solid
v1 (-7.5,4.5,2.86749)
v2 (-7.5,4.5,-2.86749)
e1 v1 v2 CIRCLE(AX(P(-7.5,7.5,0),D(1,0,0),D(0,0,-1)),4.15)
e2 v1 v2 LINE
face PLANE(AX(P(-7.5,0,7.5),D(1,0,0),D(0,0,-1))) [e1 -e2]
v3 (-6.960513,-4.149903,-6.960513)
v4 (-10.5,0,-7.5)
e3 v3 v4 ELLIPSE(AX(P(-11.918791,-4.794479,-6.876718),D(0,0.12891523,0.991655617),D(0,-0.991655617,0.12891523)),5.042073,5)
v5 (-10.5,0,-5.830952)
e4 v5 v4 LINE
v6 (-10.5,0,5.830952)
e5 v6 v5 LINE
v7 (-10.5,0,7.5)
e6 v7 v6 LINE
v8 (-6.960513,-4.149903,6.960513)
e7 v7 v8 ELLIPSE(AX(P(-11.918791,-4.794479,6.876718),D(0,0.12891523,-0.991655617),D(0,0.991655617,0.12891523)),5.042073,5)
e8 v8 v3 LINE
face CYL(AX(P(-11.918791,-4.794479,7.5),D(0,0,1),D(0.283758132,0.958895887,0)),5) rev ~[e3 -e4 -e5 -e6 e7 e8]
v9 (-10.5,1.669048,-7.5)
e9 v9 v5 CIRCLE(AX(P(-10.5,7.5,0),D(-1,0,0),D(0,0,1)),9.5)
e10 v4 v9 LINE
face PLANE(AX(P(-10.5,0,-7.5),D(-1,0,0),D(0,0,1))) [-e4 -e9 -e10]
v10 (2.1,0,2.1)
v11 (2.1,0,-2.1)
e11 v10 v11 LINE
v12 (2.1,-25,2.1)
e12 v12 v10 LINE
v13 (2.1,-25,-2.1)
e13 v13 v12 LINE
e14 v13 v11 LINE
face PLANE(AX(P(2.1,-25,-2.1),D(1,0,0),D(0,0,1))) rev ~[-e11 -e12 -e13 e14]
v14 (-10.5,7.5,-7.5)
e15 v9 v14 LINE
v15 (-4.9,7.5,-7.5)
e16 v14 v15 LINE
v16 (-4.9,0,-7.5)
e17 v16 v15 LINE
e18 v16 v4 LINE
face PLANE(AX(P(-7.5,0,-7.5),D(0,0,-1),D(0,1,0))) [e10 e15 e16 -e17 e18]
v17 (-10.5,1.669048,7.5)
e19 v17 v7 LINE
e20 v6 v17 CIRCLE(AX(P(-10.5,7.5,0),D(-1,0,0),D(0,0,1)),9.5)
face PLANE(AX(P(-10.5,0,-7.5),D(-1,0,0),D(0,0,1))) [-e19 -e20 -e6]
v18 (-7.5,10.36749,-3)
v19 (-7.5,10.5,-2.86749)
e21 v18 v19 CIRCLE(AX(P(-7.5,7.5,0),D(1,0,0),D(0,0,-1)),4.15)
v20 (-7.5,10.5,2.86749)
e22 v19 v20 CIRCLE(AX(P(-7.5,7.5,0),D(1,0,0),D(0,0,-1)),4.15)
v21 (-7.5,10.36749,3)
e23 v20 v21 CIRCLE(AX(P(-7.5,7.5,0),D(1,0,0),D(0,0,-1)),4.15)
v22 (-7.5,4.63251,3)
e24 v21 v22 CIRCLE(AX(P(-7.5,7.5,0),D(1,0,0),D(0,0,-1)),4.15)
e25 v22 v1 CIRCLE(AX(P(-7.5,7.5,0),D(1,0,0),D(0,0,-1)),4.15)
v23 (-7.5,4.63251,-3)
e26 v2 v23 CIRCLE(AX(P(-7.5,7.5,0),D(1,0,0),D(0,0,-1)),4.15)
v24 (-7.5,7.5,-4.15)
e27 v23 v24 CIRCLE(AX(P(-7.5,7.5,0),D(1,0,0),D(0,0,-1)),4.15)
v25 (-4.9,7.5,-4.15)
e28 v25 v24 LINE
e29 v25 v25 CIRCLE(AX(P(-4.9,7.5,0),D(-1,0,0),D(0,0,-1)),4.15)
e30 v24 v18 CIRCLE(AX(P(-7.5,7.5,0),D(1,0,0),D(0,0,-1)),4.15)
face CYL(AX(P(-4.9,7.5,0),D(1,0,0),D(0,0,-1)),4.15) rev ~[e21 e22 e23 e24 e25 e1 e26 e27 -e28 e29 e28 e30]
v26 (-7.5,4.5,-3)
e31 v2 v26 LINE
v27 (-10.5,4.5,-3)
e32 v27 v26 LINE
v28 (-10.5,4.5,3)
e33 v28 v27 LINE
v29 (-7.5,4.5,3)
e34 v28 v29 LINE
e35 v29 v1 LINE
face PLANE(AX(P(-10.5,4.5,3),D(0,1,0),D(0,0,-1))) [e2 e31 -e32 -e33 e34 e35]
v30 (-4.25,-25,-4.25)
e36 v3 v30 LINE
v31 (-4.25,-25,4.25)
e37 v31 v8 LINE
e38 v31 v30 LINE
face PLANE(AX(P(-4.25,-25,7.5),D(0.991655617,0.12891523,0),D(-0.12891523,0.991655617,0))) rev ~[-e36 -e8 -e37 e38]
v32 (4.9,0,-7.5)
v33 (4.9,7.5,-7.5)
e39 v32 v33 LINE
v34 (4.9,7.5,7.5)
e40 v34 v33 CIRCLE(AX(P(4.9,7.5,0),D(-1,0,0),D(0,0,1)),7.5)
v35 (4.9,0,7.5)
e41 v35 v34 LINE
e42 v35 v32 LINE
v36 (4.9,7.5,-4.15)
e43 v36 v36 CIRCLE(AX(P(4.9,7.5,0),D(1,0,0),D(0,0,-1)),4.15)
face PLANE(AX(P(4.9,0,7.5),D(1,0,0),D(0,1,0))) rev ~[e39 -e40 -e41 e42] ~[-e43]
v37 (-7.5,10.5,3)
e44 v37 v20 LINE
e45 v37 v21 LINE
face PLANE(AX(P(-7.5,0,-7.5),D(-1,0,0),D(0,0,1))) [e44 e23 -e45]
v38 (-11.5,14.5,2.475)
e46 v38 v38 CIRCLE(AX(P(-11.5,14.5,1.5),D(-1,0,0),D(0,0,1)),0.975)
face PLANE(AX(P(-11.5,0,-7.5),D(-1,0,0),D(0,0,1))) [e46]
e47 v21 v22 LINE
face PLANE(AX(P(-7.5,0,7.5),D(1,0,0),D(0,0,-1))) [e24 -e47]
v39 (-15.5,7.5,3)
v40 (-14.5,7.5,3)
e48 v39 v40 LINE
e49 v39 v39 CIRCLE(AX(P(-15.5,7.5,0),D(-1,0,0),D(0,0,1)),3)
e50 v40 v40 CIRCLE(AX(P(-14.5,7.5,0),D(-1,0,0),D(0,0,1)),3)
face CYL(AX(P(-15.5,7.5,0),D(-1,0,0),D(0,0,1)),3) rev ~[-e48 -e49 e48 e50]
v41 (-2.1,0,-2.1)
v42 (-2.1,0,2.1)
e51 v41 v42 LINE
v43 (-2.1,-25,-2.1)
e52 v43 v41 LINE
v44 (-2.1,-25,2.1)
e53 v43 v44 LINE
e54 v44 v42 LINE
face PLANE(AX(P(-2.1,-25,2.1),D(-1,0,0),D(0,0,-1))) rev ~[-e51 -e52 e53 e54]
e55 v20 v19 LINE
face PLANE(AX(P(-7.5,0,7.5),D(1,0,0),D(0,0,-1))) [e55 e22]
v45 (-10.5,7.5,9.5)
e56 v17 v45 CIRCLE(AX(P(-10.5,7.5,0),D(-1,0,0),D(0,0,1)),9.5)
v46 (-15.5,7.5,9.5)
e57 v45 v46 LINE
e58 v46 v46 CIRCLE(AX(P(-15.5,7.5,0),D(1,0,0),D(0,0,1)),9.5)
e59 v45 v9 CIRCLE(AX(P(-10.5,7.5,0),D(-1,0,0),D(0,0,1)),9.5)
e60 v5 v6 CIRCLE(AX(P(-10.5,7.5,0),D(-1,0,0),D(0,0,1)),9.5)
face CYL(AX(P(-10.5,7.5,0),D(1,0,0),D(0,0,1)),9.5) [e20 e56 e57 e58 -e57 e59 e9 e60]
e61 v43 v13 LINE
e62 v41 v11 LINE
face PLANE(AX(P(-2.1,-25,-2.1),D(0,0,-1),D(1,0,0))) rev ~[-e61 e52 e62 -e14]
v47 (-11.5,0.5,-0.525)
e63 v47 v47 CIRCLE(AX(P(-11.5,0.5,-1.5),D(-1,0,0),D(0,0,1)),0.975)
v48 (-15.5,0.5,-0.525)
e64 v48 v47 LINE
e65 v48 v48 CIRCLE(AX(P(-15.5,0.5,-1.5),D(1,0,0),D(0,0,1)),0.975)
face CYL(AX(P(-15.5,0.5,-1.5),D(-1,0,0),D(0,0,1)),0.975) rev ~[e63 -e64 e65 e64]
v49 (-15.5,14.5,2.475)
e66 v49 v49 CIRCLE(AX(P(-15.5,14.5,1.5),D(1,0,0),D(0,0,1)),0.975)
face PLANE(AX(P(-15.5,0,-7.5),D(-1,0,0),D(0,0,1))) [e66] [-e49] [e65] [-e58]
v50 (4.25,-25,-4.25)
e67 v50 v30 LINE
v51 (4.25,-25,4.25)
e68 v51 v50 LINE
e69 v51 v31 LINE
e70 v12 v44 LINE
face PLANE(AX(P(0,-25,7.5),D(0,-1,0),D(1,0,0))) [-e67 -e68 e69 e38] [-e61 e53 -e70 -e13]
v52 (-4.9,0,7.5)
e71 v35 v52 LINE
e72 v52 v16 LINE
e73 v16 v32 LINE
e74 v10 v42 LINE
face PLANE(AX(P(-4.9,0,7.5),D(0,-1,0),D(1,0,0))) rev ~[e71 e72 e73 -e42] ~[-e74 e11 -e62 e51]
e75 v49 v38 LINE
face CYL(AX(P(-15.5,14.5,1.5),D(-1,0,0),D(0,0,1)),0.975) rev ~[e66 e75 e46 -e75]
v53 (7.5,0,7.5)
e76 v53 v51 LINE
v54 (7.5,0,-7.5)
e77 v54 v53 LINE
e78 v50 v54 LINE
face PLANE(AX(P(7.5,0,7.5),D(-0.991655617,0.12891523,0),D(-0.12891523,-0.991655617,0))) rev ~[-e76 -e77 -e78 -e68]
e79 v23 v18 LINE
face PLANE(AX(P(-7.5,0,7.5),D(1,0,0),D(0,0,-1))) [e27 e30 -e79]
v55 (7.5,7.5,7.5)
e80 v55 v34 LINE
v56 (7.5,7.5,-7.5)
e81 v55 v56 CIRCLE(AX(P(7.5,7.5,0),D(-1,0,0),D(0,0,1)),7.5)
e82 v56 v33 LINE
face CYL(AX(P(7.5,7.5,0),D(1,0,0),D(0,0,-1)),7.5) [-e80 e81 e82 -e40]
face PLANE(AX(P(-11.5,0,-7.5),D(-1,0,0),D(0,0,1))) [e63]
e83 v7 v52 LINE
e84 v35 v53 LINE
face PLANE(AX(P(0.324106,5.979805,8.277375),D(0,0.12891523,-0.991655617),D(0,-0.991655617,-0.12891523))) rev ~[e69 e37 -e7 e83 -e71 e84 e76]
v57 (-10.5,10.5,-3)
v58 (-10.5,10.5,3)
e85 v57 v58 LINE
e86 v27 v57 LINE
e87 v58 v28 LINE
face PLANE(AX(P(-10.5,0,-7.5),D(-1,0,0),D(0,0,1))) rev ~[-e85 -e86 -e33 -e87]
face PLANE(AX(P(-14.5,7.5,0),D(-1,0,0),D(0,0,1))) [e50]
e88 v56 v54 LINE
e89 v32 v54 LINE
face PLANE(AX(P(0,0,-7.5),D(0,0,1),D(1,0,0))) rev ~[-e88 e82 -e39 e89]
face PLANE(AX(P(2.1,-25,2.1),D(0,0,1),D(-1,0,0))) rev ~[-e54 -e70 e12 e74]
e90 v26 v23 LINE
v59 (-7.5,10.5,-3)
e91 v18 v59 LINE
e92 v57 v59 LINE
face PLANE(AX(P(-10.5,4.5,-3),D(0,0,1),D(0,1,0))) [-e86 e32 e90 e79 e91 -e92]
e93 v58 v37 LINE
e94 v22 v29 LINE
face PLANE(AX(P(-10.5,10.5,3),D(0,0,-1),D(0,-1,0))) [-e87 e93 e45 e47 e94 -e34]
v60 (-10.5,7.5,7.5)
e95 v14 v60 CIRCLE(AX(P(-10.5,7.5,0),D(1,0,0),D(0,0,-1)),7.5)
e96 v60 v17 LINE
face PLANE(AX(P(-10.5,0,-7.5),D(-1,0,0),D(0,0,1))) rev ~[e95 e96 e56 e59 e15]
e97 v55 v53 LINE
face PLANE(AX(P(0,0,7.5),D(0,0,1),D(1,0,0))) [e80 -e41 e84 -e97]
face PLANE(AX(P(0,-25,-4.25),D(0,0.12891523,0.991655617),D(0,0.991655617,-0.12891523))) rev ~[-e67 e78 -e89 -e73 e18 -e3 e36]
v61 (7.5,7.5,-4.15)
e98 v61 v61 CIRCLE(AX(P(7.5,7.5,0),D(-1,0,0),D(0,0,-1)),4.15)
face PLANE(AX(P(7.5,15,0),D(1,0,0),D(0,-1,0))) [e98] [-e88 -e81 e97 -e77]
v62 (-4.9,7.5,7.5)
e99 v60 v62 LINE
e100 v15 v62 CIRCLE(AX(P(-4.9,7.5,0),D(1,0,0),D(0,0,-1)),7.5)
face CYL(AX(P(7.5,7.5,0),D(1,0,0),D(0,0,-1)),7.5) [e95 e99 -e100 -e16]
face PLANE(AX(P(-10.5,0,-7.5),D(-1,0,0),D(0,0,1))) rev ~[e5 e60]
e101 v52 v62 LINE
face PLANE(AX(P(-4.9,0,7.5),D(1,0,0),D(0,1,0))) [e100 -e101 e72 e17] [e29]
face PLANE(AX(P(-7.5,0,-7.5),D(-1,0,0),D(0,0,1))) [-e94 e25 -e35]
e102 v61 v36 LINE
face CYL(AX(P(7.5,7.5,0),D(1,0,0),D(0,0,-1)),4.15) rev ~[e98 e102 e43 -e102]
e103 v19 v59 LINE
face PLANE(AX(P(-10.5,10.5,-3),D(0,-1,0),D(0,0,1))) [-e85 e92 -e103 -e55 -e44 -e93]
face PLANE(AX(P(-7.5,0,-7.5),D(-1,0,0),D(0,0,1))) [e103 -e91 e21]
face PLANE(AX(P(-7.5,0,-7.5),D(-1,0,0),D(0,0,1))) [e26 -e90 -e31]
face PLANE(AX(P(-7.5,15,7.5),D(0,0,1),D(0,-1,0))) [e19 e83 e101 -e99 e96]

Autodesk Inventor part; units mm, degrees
ref_plane "YZ Plane" through (0, 0, 0) normal (1, 0, 0) x (0, 1, 0)
ref_plane "XZ Plane" through (0, 0, 0) normal (0, 1, 0) x (-1, 0, 0)
ref_plane "XY Plane" through (0, 0, 0) normal (0, 0, 1) x (1, 0, 0)
sketch "Sketch1" plane through (0, 0, 0) normal (0, 0, 1) x (1, 0, 0)
  line L0 (0, 0) -> (-7.5, 0)
  line L1 (-7.5, 0) -> (-7.5, 15)
  line L2 (-7.5, 15) -> (7.5, 15)
  line L3 (7.5, 15) -> (7.5, 0)
  line L4 (7.5, 0) -> (-7.5, 0)
  dimension "d55" = 7.5
  dimension "d56" = 15
  dimension "d57" = 15
extrude "Extrusion1" add sketch "Sketch1" along normal mid plane 15
sketch "Sketch11" plane through (0, 0, 7.5) normal (0, 0, 1) x (1, 0, 0)
  line L0 (7.5, 15) -> (-7.5, 15) projected
  line L1 (0, 15) -> (0, -25)
  line L2 (0, -25) -> (4.25, -25)
  line L3 (0, -25) -> (-4.25, -25)
  line L4 (-7.5, 0) -> (7.5, 0) projected
  line L5 (-4.25, -25) -> (-7.5, 0)
  line L6 (-7.5, 0) -> (7.5, 0)
  line L7 (7.5, 0) -> (4.25, -25)
  point P0 (0, 0)
  dimension "d58" = 40
  dimension "d59" = 4.25
  dimension "d60" = 4.25
extrude "Extrusion7" add sketch "Sketch11" against normal blind 15
sketch "Sketch13" plane through (0, 0, 0) normal (1, 0, 0) x (0, 1, 0)
  line L0 (15, -7.5) -> (15, 7.5) projected
  line L1 (15, 0) -> (-25, 0)
  line L2 (-25, 7.5) -> (-25, -7.5) projected
  line L3 (-25, 0) -> (-25, 4.25)
  line L4 (-25, 7.5) -> (-25, -7.5) projected
  line L5 (-25, 4.25) -> (-25, 0)
  line L6 (-25, 0) -> (-25, -4.25)
  line L7 (0, -7.5) -> (15, -7.5) projected
  line L8 (-25, -4.25) -> (0, -7.5)
  line L9 (0, -7.5) -> (0, 7.5)
  line L10 (0, 7.5) -> (-25, 4.25)
  line L11 (-25, 4.25) -> (-25, 7.5)
  line L12 (-25, 7.5) -> (0, 7.5)
  line L13 (-25, -4.25) -> (-25, -7.5)
  line L14 (-25, -7.5) -> (0, -7.5) projected
  line L15 (-25, -7.5) -> (0, -7.5)
  point P0 (0, 0)
  dimension "d68" = 40
  dimension "d69" = 4.25
  dimension "d70" = 4.25
extrude "Extrusion8" cut sketch "Sketch13" along normal through all both and the other way through all contours L14 L2 L8 | L10 L2 L12
sketch "Sketch15" plane through (-4.25, -25, -4.25) normal (0, -1, 0) x (1, 0, 0)
  line L0 (4.25, 4.25) -> (2.15, 4.25)
  line L1 (0, 8.5) -> (0, 0) projected
  line L2 (2.15, 4.25) -> (2.15, 2.15)
  line L3 (2.15, 2.15) -> (6.35, 2.15)
  line L4 (6.35, 2.15) -> (6.35, 6.35)
  line L5 (6.35, 6.35) -> (2.15, 6.35)
  line L6 (2.15, 6.35) -> (2.15, 4.25)
  point P0 (8.5, 8.5)
  point P1 (8.5, 0)
  dimension "d112" = 2.1
  dimension "d113" = 2.1
  dimension "d114" = 4.2
  dimension "d115" = 4.2
extrude "Extrusion9" cut sketch "Sketch15" against normal through all
sketch "Sketch16" plane through (0, 0, 7.5) normal (0, 0, 1) x (1, 0, 0)
  line L0 (0, 0) -> (4.9, 0)
  line L1 (-7.5, 0) -> (7.5, 0) projected
  line L2 (4.9, 0) -> (4.9, 16.5506)
  line L3 (0, 0) -> (-4.9, 0)
  line L4 (-4.9, 0) -> (-4.9, 16.5506)
  line L5 (-4.9, 16.5506) -> (4.9, 16.5506)
  dimension "d83" = 4.9
  dimension "d84" = 4.9
extrude "Extrusion10" cut sketch "Sketch16" against normal through all
sketch "Sketch17" plane through (7.5, 15, 7.5) normal (1, 0, 0) x (0, 0, -1)
  line L0 (15, 0) -> (0, 0) projected
  line L1 (0, 0) -> (7.5, 0)
  line L2 (0, 0) -> (0, -15) projected
  line L3 (0, -7.5) -> (0, 0)
  line L4 (0, 0) -> (15, 0)
  line L5 (15, -15) -> (15, 0) projected
  line L6 (15, 0) -> (15, -7.5)
  arc A0 (15, -7.5) -> (0, -7.5) centre (7.5, -7.5) ccw
  line L7 (0, -15) -> (0, 0) projected
  line L8 (0, -7.5) -> (0, 0)
  line L9 (15, 0) -> (0, 0) projected
  line L10 (0, 0) -> (15, 0)
  line L11 (15, 0) -> (15, -7.5)
  point P0 (7.5, -15)
  dimension "d133" = 15
extrude "Extrusion11" cut sketch "Sketch17" against normal through all
sketch "Sketch18" plane through (7.5, 0, 7.5) normal (1, 0, 0) x (0, 0, -1)
  line L0 (0, 0) -> (0, 15)
  line L1 (0, 15) -> (15, 15)
  line L2 (15, 15) -> (15, 0)
  line L3 (15, 0) -> (0, 0)
  line L4 (0, 15) -> (15, 0)
  line L5 (15, 15) -> (0, 0)
  circle A0 centre (7.5, 7.5) radius 4.15
  point P0 (7.5, 0)
  dimension "d90" = 15
  dimension "d91" = 8.3
extrude "Extrusion12" cut sketch "Sketch18" against normal blind 8.3 contours A0 L4 L5 | L5 L4 A0 | A0 L5 L4 | L4 L5 A0
sketch "Sketch19" plane through (-7.5, 0, -7.5) normal (-1, 0, 0) x (0, 0, 1)
  line L0 (0, 0) -> (0, 15)
  line L1 (0, 15) -> (15, 15)
  line L2 (15, 15) -> (15, 0)
  line L3 (15, 0) -> (0, 0) projected
  line L4 (15, 0) -> (0, 0)
  point P0 (7.5, 0)
  dimension "d94" = 15
extrude "Extrusion13" add sketch "Sketch19" along normal blind 3
sketch "Sketch20" plane through (-4.9, 0, 7.5) normal (1, 0, 0) x (0, 0, -1)
  line L0 (0, 0) -> (0, 15) projected
  line L1 (0, 0) -> (0, 15)
  line L2 (0, 15) -> (15, 15)
  line L3 (15, 0) -> (0, 0) projected
  line L4 (15, 15) -> (15, 0)
  line L5 (15, 0) -> (0, 0)
  line L6 (0, 0) -> (15, 15)
  line L7 (0, 15) -> (15, 0)
  circle A0 centre (7.5, 7.5) radius 4.15
  point P0 (7.5, 0)
  dimension "d97" = 15
  dimension "d98" = 8.3
extrude "Extrusion14" cut sketch "Sketch20" against normal blind 2.6 contours A0 L7 L6 | L6 L7 A0 | A0 L6 L7 | L7 L6 A0
sketch "Sketch21" plane through (-10.5, 0, -7.5) normal (-1, 0, 0) x (0, 0, 1)
  line L0 (0, 15) -> (0, 0) projected
  line L1 (15, 0) -> (15, 15) projected
  line L2 (0, 0) -> (15, 15)
  line L3 (0, 15) -> (0, 0) projected
  line L4 (15, 15) -> (0, 15)
  line L5 (0, 15) -> (15, 0)
  line L6 (7.5, 7.5) -> (7.5, 10.5)
  line L7 (7.5, 10.5) -> (10.5, 10.5)
  line L8 (10.5, 10.5) -> (10.5, 4.5)
  line L9 (10.5, 4.5) -> (4.5, 4.5)
  line L10 (4.5, 4.5) -> (4.5, 10.5)
  line L11 (4.5, 10.5) -> (10.5, 10.5)
  point P0 (7.5, 0)
  point P1 (0, 7.5)
  dimension "d101" = 3
  dimension "d102" = 3
  dimension "d103" = 6
  dimension "d104" = 6
extrude "Extrusion15" cut sketch "Sketch21" against normal blind 3 contours L11 L6 L5 | L5 L2 L10 | L2 L5 L9 | L8 L5 L2 | L2 L6 L7
sketch "Sketch23" plane through (-4.9, 0, 7.5) normal (1, 0, 0) x (0, 0, -1)
  line L0 (0, 0) -> (0, 15) projected
  line L1 (0, 0) -> (0, 15)
  line L2 (0, 15) -> (15, 15)
  line L3 (15, 15) -> (15, 0)
  line L4 (15, 0) -> (0, 0)
  line L5 (0, 15) -> (7.5, 15)
  arc A0 (15, 7.5) -> (0, 7.5) centre (7.5, 7.5) ccw
  line L6 (0, 7.5) -> (0, 15)
  line L7 (15, 15) -> (15, 7.5)
  point P0 (7.5, 0)
  point P1 (0, 7.5)
  dimension "d107" = 15
extrude "Extrusion16" cut sketch "Sketch23" against normal through all contours L0 L2 A0 | L2 L3 A0
fillet "Fillet2" radius 5 1 edges at (-7.5, 0, 0)
sketch "Sketch24" plane through (-10.5, 0, -7.5) normal (-1, 0, 0) x (0, 0, 1)
  line L0 (3.25, -25) -> (0, 0) projected
  line L1 (0, 0) -> (7.5, 0)
  line L2 (0, 0) -> (15, 0) projected
  line L3 (7.5, 0) -> (7.5, 4.5)
  line L4 (10.5, 4.5) -> (4.5, 4.5) projected
  line L5 (7.5, 4.5) -> (7.5, 7.5)
  circle A0 centre (7.5, 7.5) radius 9.5
  line L6 (1.669, 0) -> (13.331, 0)
  point P0 (13.331, 0)
  point P1 (1.669, 0)
  dimension "d116" = 3
  dimension "d117" = 19
extrude "Extrusion17" add sketch "Sketch24" along normal blind 5
sketch "Sketch25" plane through (-15.5, 0, -7.5) normal (-1, 0, 0) x (0, 0, 1)
  line L0 (0, 0) -> (1.669, 0) projected
  line L1 (0, 0) -> (7.5, 0)
  arc A0 (15, 1.669) -> (0, 1.669) centre (7.5, 7.5) ccw projected
  line L2 (7.5, 0) -> (7.5, 7.5)
  line L3 (7.5, 7.5) -> (7.5, 14.5)
  line L4 (7.5, 14.5) -> (9, 14.5)
  circle A1 centre (9, 14.5) radius 0.975
  line L5 (7.5, 7.5) -> (7.5, 0.5)
  line L6 (7.5, 0.5) -> (6, 0.5)
  line L7 (0, 0) -> (15, 0) projected
  circle A2 centre (6, 0.5) radius 0.975
  point P0 (13.331, 0)
  dimension "d120" = 7
  dimension "d121" = 1.5
  dimension "d122" = 1.95
  dimension "d123" = 7
  dimension "d124" = 1.5
  dimension "d125" = 90
  dimension "d126" = 1.95
extrude "Extrusion18" cut sketch "Sketch25" against normal blind 4 contours A2 L1 | L1 A2 | A1
sketch "Sketch26" plane through (-15.5, 7.5, 0) normal (-1, 0, 0) x (0, 0, 1)
  circle A0 centre (0, 0) radius 3
  point P0 (0, -7.5)
  dimension "d129" = 6
extrude "Extrusion19" cut sketch "Sketch26" against normal blind 1
equation "\"d92\" = d91"
equation "\"d105\" = d101"
properties part number "Hip joint 4 med servofeste"
